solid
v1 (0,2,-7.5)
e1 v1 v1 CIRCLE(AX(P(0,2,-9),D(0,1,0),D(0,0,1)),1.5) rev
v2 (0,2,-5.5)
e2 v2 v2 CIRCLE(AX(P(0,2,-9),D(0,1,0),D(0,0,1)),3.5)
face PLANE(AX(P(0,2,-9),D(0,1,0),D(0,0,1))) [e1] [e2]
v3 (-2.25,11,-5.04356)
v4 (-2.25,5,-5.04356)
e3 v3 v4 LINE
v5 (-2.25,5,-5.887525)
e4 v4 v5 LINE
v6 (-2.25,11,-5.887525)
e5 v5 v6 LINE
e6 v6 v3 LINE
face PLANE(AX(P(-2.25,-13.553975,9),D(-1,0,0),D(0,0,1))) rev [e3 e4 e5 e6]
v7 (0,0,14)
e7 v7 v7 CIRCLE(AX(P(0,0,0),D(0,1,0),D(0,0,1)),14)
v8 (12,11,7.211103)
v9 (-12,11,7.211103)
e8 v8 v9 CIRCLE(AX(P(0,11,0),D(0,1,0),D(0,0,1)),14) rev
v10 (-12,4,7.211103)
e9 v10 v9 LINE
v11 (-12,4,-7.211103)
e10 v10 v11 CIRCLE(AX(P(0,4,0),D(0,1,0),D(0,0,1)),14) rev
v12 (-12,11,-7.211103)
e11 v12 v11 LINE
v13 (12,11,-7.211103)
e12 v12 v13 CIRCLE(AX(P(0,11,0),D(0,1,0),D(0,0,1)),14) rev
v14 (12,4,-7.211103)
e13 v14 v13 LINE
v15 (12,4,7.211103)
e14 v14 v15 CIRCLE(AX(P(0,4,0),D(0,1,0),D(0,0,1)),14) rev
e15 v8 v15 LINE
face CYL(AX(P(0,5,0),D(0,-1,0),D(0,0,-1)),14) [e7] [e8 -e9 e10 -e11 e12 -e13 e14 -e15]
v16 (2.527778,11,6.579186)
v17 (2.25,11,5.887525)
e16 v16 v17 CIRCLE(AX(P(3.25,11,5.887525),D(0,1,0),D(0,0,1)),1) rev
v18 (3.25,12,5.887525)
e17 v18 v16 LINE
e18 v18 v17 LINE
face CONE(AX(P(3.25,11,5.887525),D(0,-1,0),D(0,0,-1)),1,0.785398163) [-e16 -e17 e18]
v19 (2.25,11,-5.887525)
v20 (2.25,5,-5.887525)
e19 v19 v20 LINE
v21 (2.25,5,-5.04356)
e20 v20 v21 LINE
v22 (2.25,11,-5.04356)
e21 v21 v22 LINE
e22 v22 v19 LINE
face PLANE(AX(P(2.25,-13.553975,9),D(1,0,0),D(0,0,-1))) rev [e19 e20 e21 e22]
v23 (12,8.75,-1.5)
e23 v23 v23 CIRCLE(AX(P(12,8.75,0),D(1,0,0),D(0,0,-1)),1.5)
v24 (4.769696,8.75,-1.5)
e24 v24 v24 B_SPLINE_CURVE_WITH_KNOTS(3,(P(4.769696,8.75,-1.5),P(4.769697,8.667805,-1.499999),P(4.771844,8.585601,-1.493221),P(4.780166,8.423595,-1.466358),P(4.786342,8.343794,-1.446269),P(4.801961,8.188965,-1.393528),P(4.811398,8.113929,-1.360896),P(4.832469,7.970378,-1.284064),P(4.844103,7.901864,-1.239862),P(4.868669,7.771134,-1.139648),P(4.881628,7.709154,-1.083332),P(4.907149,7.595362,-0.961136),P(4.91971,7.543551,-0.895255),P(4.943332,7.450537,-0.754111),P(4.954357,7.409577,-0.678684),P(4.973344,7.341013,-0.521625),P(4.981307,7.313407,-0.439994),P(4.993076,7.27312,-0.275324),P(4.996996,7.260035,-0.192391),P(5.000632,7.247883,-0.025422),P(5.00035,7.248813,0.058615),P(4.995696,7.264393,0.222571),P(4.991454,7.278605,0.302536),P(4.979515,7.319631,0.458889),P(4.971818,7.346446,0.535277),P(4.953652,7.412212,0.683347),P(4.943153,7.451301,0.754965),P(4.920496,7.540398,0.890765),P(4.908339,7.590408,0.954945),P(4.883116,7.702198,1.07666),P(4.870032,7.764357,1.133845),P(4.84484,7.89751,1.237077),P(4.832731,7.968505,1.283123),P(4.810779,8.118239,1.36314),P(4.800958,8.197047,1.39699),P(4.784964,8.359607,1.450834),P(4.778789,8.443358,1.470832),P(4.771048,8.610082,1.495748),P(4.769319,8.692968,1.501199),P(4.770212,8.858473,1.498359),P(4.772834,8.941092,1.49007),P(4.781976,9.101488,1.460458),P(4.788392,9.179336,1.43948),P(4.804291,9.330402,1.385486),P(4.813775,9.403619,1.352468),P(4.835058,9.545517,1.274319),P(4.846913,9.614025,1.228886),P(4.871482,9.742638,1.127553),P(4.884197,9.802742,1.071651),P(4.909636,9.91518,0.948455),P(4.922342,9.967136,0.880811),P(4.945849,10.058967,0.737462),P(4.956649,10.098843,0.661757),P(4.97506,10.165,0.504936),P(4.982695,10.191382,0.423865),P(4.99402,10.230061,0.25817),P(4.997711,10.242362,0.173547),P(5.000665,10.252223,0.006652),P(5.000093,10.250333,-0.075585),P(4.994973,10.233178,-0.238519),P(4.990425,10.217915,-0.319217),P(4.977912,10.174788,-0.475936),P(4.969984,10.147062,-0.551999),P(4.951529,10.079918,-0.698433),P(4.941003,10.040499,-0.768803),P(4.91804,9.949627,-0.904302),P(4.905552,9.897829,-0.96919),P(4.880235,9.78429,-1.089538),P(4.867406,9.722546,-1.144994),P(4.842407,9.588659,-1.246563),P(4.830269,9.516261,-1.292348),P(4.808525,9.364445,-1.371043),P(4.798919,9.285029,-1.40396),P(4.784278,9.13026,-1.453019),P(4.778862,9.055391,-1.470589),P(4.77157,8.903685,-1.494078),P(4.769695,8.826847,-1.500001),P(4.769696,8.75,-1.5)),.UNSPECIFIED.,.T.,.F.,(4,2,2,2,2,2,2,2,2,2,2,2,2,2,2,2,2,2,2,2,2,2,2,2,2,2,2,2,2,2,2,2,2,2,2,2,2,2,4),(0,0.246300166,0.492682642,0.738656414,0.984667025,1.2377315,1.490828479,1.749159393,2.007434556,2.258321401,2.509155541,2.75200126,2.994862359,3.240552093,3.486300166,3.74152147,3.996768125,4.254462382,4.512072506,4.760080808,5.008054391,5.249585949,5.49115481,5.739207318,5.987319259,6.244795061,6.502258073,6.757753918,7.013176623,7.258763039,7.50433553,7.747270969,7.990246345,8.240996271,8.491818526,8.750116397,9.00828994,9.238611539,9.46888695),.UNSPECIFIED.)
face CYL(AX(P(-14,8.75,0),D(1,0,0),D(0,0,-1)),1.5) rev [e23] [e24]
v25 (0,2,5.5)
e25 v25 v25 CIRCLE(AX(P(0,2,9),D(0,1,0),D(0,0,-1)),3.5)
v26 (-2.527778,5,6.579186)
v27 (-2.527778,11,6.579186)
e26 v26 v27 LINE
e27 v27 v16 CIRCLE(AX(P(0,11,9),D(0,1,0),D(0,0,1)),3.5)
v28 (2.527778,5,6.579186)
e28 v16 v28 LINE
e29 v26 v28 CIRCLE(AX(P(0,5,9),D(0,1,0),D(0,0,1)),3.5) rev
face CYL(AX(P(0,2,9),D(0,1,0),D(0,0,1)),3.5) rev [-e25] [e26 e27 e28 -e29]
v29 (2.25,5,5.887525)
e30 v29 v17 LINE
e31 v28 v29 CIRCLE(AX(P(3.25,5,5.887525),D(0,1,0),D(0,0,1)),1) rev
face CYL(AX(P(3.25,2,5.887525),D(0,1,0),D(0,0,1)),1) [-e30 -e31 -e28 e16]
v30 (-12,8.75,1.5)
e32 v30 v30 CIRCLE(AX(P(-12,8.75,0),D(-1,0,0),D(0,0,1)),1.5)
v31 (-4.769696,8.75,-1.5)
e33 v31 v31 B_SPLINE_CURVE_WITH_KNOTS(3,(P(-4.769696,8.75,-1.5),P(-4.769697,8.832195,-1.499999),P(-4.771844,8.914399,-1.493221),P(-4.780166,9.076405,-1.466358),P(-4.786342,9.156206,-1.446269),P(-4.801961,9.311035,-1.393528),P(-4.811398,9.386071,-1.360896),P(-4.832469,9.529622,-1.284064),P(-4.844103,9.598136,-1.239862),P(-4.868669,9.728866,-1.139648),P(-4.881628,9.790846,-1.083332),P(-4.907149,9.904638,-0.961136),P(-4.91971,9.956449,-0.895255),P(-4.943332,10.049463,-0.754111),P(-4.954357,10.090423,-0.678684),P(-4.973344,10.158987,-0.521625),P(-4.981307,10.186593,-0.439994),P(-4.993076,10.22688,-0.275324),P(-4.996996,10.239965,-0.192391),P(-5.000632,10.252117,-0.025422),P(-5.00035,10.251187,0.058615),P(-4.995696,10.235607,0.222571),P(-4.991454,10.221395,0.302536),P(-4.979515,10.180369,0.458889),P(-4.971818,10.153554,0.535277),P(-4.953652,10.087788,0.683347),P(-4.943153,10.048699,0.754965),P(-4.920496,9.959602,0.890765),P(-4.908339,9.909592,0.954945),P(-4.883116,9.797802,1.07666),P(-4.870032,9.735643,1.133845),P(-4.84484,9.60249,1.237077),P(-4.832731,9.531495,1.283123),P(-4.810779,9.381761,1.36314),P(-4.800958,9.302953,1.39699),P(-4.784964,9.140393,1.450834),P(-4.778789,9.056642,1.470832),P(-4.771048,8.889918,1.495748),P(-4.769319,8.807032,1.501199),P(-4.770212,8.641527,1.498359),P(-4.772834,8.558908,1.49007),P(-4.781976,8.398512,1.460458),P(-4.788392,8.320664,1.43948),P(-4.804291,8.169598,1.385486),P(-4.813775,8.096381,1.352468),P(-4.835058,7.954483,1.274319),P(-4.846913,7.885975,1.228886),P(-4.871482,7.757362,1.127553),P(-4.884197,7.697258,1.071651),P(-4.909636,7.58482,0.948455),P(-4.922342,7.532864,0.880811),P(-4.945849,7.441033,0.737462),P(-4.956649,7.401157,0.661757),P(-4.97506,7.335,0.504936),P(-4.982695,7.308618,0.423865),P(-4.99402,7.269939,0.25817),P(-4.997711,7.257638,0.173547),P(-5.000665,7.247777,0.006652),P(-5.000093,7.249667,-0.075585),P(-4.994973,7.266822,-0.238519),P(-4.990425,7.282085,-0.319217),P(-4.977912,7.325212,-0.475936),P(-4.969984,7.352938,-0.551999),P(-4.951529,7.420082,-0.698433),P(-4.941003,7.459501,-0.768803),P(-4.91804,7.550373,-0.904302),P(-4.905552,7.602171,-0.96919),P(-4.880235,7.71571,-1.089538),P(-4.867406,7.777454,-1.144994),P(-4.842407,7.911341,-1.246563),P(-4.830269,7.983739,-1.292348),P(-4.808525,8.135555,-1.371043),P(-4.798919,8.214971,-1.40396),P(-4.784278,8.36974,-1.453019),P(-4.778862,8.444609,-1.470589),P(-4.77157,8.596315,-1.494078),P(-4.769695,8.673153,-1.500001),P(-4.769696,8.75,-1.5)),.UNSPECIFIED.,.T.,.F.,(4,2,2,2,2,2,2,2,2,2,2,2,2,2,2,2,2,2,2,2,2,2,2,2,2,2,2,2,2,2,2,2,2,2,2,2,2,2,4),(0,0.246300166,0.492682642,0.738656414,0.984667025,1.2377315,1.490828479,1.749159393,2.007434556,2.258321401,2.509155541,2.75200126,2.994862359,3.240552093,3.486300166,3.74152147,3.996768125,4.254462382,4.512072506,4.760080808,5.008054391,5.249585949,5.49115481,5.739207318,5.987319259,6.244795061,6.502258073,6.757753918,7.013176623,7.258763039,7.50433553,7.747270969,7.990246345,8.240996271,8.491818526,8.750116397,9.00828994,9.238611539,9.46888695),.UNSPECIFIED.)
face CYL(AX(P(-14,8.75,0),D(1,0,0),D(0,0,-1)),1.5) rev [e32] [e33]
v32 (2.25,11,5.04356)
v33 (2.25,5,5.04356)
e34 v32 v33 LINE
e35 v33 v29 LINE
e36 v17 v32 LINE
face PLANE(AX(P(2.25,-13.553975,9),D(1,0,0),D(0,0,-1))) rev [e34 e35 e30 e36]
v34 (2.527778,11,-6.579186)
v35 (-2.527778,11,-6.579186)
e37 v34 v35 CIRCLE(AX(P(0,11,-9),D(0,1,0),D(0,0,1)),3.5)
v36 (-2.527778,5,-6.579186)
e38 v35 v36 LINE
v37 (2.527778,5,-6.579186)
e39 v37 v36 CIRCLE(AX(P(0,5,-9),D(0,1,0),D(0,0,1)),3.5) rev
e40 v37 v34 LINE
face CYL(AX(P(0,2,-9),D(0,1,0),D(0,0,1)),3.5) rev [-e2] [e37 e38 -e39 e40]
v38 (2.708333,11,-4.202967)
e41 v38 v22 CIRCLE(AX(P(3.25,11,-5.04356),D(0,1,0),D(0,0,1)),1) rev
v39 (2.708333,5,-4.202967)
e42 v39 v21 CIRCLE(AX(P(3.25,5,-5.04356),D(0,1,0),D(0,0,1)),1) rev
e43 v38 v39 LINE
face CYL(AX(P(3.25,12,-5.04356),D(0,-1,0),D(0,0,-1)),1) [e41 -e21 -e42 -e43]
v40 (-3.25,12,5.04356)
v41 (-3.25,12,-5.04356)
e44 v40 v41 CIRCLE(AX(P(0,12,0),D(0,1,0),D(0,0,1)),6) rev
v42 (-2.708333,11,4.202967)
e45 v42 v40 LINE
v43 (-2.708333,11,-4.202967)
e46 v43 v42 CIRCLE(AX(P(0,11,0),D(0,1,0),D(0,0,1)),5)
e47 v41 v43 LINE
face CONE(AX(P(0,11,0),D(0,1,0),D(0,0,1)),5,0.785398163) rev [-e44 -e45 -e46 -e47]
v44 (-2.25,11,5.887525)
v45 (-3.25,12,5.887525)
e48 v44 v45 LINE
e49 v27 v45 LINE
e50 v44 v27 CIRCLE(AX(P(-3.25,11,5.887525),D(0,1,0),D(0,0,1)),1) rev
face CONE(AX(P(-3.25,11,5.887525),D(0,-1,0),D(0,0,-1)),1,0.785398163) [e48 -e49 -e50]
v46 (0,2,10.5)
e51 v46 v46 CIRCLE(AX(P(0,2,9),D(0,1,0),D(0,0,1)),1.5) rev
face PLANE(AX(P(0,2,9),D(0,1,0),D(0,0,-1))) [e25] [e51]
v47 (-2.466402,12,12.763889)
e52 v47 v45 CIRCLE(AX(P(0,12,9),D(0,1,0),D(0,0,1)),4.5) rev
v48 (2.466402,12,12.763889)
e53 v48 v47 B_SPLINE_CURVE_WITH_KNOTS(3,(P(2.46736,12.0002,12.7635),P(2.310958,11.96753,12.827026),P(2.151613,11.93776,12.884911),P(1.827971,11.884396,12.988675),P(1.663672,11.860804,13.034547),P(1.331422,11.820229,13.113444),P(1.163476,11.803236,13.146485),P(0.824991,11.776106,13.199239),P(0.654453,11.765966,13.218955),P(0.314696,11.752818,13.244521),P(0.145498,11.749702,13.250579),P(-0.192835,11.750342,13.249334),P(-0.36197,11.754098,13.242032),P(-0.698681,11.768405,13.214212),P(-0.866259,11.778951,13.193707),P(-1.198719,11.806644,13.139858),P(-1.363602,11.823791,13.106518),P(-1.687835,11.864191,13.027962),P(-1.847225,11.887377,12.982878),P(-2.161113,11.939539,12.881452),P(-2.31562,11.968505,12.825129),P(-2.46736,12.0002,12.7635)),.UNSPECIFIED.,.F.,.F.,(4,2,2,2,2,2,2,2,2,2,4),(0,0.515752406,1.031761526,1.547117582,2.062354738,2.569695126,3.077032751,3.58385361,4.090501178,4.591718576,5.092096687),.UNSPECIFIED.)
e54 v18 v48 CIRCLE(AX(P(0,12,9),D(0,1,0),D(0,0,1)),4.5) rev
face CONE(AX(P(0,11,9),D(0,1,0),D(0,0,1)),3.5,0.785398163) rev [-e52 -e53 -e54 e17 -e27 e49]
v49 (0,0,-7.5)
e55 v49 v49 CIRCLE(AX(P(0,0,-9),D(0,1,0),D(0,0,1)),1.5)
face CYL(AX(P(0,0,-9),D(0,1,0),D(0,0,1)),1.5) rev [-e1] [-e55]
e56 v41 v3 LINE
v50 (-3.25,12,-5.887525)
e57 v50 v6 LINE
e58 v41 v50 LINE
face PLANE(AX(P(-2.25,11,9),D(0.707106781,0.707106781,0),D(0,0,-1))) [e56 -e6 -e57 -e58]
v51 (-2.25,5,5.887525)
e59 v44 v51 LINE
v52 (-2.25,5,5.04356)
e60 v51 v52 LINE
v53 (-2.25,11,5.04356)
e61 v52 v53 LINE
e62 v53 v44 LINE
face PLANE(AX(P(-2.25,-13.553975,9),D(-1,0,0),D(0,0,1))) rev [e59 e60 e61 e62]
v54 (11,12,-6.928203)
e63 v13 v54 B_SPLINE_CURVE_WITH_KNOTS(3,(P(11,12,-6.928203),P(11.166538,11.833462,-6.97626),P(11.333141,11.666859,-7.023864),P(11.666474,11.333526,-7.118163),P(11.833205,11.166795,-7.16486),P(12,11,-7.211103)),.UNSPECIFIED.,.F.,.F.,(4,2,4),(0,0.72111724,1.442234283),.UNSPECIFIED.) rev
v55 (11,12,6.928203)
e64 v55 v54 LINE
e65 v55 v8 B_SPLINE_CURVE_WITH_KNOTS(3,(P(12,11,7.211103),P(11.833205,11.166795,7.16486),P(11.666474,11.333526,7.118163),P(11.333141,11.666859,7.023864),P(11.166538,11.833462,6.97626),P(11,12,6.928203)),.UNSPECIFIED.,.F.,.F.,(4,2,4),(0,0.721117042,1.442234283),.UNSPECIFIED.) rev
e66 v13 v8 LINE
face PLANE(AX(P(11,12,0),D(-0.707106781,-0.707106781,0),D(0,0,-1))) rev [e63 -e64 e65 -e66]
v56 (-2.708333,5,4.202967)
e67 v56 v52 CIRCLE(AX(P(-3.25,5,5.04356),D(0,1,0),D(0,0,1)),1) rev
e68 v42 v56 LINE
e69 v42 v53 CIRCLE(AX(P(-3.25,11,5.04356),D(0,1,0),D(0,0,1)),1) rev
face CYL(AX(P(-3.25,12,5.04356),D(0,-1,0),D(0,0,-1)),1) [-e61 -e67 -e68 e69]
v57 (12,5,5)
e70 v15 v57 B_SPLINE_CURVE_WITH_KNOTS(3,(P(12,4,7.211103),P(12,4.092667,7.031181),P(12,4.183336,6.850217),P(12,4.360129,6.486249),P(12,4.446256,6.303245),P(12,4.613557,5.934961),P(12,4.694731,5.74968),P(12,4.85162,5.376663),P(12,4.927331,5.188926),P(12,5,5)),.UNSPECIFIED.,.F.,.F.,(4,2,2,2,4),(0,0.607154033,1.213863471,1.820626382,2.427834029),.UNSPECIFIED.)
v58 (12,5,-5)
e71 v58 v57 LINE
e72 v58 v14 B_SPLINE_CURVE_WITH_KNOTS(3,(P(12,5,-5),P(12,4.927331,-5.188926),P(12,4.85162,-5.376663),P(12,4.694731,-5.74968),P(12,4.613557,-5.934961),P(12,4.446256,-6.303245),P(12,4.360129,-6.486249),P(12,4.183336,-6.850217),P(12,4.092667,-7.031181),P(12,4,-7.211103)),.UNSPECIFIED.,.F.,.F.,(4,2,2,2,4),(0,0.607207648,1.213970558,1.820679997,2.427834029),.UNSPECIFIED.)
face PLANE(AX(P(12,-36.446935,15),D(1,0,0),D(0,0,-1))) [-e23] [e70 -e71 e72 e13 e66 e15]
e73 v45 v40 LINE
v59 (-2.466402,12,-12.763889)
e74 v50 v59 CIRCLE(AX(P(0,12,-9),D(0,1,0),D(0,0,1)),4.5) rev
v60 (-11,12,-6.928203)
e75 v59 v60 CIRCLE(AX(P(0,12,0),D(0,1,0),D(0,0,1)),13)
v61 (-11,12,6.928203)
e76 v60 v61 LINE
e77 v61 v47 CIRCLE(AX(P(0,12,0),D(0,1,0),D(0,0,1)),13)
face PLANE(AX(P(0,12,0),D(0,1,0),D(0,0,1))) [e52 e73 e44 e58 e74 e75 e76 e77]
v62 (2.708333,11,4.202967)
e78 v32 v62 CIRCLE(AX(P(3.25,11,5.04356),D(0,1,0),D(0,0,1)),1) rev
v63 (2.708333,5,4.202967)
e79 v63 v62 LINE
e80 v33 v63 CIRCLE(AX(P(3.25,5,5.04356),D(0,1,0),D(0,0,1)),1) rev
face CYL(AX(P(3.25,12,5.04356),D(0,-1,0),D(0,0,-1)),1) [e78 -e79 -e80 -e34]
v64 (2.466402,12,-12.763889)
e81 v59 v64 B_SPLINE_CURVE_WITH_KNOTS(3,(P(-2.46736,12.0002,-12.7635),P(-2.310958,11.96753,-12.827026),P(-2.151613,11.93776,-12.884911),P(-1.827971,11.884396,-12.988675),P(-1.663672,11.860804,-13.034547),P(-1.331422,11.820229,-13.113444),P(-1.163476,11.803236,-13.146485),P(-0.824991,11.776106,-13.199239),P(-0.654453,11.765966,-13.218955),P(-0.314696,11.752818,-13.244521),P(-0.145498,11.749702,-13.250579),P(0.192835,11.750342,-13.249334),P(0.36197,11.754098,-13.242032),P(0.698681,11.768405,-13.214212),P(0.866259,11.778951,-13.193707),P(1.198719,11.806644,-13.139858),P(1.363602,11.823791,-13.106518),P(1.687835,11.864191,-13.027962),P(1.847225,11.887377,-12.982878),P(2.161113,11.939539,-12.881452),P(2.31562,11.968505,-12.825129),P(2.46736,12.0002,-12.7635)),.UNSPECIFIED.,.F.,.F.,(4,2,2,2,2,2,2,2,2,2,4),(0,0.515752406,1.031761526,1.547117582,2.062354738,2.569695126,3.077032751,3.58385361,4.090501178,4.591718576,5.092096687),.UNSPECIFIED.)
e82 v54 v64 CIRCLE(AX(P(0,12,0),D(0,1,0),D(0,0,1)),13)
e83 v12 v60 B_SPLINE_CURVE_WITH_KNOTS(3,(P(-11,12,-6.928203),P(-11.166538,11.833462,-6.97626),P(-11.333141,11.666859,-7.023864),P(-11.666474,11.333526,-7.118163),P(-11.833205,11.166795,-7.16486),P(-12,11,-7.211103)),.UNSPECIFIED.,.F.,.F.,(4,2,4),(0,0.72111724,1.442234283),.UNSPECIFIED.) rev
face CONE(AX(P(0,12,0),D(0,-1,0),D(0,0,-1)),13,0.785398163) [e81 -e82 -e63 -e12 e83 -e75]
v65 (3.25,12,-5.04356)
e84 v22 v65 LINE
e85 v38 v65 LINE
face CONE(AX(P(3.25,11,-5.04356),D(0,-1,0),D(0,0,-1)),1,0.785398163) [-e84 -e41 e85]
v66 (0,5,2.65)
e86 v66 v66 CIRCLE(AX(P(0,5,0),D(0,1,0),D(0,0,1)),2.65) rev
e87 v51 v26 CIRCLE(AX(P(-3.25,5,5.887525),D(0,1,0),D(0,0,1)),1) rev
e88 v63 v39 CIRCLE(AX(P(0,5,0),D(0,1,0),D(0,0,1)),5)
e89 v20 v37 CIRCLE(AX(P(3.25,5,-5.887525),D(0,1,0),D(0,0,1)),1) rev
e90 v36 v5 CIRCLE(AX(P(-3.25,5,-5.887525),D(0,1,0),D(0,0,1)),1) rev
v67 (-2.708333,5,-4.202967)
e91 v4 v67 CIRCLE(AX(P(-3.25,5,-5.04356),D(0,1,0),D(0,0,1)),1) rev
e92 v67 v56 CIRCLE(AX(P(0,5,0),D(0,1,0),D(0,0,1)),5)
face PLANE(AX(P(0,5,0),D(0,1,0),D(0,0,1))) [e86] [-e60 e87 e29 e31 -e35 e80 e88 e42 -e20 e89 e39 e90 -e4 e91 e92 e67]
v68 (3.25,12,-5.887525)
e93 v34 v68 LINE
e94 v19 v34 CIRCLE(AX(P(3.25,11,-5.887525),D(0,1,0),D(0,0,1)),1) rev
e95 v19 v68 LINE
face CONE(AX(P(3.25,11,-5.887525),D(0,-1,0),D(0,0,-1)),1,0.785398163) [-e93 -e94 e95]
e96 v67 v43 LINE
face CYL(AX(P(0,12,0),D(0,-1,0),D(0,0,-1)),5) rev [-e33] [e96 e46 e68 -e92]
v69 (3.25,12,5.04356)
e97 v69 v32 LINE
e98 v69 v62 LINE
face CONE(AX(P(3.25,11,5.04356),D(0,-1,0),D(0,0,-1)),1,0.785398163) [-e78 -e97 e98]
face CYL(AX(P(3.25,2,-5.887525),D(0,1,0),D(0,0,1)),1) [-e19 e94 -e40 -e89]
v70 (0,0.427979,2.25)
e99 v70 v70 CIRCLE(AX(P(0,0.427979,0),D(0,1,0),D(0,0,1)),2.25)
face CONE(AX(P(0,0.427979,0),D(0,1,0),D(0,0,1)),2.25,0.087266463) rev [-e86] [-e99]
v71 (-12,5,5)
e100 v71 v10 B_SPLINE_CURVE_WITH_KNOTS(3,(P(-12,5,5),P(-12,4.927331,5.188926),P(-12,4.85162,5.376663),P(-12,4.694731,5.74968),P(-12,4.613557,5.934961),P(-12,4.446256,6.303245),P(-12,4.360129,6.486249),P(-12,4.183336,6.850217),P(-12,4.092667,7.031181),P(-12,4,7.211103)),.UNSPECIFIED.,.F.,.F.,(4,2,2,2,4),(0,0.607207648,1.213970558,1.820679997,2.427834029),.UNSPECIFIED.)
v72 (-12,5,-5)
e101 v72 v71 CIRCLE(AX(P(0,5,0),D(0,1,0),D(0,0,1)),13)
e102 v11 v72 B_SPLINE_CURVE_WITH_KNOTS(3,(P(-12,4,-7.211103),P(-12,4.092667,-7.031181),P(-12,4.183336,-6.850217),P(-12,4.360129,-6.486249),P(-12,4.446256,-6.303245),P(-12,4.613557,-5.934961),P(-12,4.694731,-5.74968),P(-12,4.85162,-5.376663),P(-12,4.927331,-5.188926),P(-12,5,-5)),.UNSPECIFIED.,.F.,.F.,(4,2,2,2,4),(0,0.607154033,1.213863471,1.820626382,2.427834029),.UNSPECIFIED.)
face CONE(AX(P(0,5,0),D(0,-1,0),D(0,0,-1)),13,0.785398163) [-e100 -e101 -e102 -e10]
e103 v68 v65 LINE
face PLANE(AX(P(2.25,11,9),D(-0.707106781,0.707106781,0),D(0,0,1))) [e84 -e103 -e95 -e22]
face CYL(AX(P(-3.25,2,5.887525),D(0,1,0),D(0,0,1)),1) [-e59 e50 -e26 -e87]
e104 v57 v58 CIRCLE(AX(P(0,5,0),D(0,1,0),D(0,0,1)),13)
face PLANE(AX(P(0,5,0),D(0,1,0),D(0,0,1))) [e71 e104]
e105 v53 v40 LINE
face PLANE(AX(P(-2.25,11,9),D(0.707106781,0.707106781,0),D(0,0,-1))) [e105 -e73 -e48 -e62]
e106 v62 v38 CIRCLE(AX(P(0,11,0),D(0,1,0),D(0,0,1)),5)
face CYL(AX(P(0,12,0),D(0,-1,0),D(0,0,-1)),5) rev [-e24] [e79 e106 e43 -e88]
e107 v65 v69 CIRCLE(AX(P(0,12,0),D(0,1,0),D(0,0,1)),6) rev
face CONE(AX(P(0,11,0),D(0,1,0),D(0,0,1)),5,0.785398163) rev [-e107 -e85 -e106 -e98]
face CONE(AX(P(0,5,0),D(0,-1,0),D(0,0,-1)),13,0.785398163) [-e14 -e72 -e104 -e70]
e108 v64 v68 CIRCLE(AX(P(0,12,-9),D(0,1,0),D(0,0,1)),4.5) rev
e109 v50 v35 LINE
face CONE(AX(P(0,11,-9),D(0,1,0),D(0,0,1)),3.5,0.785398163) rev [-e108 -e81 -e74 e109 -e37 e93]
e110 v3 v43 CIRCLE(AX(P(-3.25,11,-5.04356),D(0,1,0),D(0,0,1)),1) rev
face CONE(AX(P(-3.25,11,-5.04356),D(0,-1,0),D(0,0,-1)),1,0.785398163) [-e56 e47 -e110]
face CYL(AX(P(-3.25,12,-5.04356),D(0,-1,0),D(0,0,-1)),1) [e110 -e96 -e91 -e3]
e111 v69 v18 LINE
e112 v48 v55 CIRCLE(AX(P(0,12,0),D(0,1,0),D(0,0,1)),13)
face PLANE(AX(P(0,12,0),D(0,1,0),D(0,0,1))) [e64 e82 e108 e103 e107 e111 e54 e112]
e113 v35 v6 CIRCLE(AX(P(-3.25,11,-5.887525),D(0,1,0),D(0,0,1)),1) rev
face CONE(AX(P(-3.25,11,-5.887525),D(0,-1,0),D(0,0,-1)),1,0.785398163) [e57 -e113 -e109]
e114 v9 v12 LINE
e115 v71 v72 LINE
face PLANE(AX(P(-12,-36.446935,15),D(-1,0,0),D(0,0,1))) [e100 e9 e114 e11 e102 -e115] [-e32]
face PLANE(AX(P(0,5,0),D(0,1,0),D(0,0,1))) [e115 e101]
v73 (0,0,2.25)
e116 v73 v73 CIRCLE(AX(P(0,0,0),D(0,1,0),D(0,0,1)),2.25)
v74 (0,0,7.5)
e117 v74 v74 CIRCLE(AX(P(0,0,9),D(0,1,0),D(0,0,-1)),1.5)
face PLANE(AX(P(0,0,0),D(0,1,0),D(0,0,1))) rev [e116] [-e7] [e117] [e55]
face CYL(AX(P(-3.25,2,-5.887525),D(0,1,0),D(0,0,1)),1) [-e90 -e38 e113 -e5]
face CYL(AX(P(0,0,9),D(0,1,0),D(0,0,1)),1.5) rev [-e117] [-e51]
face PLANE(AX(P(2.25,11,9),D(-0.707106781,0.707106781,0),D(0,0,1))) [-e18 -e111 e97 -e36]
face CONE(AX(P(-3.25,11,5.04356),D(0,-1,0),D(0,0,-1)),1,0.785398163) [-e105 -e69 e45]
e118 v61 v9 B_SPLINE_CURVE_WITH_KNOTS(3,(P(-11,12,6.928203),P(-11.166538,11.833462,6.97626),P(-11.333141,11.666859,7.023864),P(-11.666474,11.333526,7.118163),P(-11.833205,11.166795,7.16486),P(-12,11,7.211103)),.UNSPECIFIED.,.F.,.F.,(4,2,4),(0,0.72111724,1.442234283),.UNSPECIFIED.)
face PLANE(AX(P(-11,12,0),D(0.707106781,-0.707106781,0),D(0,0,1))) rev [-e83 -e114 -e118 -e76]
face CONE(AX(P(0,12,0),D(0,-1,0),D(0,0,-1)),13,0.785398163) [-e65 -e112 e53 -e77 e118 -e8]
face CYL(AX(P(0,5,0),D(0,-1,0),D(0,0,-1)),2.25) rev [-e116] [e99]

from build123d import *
from build123d.topology import SkipClean

# Parameters (mm, degrees)
SKETCH1_R           = 14
SKETCH1_R_2         = 2.25
BOSS_EXTRUDE1_DEPTH = 5
SKETCH2_R           = 1.5
CUT_EXTRUDE1_DEPTH  = 21.420577857
SKETCH4_R           = 3.5
CUT_EXTRUDE2_DEPTH  = 3
CIRPATTERN1_COUNT   = 2
SKETCH5_R           = 14
SKETCH5_R_2         = 5
BOSS_EXTRUDE2_DEPTH = 7
SKETCH6_R           = 3.5
CUT_EXTRUDE3_DEPTH  = 22
SKETCH9_OUTSIDE_W   = 38.276
SKETCH9_OUTSIDE_H   = 38.276
SKETCH9_OUTSIDE_W_2 = 24
SKETCH9_OUTSIDE_H_2 = 30
CUT_EXTRUDE5_DEPTH  = 7
SKETCH10_R          = 1.5
CUT_EXTRUDE6_DEPTH  = 32.874754901
SKETCH12_W          = 4.5
SKETCH12_H          = 18
CUT_EXTRUDE7_DEPTH  = 7
CHAMFER2_SIZE       = 0.4
CHAMFER2_SIZE2      = 4.572020921
FILLET2_R           = 1
CHAMFER3_SIZE       = 1


# Some blends are built 0.0001 mm under size
with BuildPart() as part:
    # Sketch1 → Boss-Extrude1 (new body)
    with BuildSketch(Plane(origin=(0, 0, 0), x_dir=(1, 0, 0), z_dir=(0, 1, 0))):
        with Locations(Location((0, 0, 0), (0, 0, 270))):
            Circle(SKETCH1_R)
        with Locations(Location((0, 0, 0), (0, 0, 270))):
            Circle(SKETCH1_R_2, mode=Mode.SUBTRACT)
    extrude(amount=BOSS_EXTRUDE1_DEPTH)

    # Sketch2 → Cut-Extrude1 (cut, through all)
    with BuildSketch(Plane(origin=(0, 5, 0), x_dir=(1, 0, 0), z_dir=(0, 1, 0))):
        with Locations(Location((0, 9, 0), (0, 0, 270))):
            Circle(SKETCH2_R)
    cut_extrude1 = extrude(amount=-CUT_EXTRUDE1_DEPTH, mode=Mode.SUBTRACT)

    # Sketch4 → Cut-Extrude2 (cut)
    with BuildSketch(Plane(origin=(0, 5, 0), x_dir=(1, 0, 0), z_dir=(0, 1, 0))):
        with Locations(Location((0, 9, 0), (0, 0, 270))):
            Circle(SKETCH4_R)
    cut_extrude2 = extrude(amount=-CUT_EXTRUDE2_DEPTH, mode=Mode.SUBTRACT)

    # CirPattern1: Cut-Extrude1, Cut-Extrude2 ×2 about axis
    cirpattern1_axis = Axis((0, 0, 0), (0, 1, 0))
    add([cut_extrude1.rotate(cirpattern1_axis, i * 360 / CIRPATTERN1_COUNT) for i in range(1, CIRPATTERN1_COUNT)], mode=Mode.SUBTRACT)
    add([cut_extrude2.rotate(cirpattern1_axis, i * 360 / CIRPATTERN1_COUNT) for i in range(1, CIRPATTERN1_COUNT)], mode=Mode.SUBTRACT)

    # Sketch5 → Boss-Extrude2 (add)
    with BuildSketch(Plane(origin=(0, 5, 0), x_dir=(1, 0, 0), z_dir=(0, 1, 0))):
        with Locations(Location((0, 0, 0), (0, 0, 270))):
            Circle(SKETCH5_R)
        with Locations(Location((0, 0, 0), (0, 0, 270))):
            Circle(SKETCH5_R_2, mode=Mode.SUBTRACT)
    extrude(amount=BOSS_EXTRUDE2_DEPTH)

    # Sketch6 → Cut-Extrude3 (cut, through all)
    with SkipClean():  # the faces are left unmerged after this step: merging them gives an invalid solid
        with BuildSketch(Plane(origin=(0, 5, 0), x_dir=(1, 0, 0), z_dir=(0, 1, 0))):
            with Locations(Location((0, 9, 0), (0, 0, 270))):
                Circle(SKETCH6_R)
            with Locations(Location((0, -9, 0), (0, 0, 270))):
                Circle(SKETCH6_R)
        extrude(amount=CUT_EXTRUDE3_DEPTH, mode=Mode.SUBTRACT)

    # Sketch9 outside → Cut-Extrude5 (cut)
    with SkipClean():  # the faces are left unmerged after this step: merging them gives an invalid solid
        with BuildSketch(Plane(origin=(0, 12, 0), x_dir=(1, 0, 0), z_dir=(0, 1, 0))):
            Rectangle(SKETCH9_OUTSIDE_W, SKETCH9_OUTSIDE_H)
            Rectangle(SKETCH9_OUTSIDE_W_2, SKETCH9_OUTSIDE_H_2, mode=Mode.SUBTRACT)
        extrude(amount=-CUT_EXTRUDE5_DEPTH, mode=Mode.SUBTRACT)

    # Sketch10 → Cut-Extrude6 (cut, through all)
    with SkipClean():  # the faces are left unmerged after this step: merging them gives an invalid solid
        with BuildSketch(Plane(origin=(12, 0, 0), x_dir=(0, 0, -1), z_dir=(1, 0, 0))):
            with Locations((0, 8.75)):
                Circle(SKETCH10_R)
        extrude(amount=-CUT_EXTRUDE6_DEPTH, mode=Mode.SUBTRACT)

    # Sketch12 → Cut-Extrude7 (cut)
    with SkipClean():  # the faces are left unmerged after this step: merging them gives an invalid solid
        with BuildSketch(Plane(origin=(0, 12, 0), x_dir=(1, 0, 0), z_dir=(0, 1, 0))):
            Rectangle(SKETCH12_W, SKETCH12_H)
        extrude(amount=-CUT_EXTRUDE7_DEPTH, mode=Mode.SUBTRACT)
    add(part.part.scale(1), mode=Mode.REPLACE)  # the faces are merged on a copy

    # Chamfer2
    chamfer2_edges = [part.edges().sort_by_distance(p)[0] for p in [
        (1.59099026, 5, 1.590990255),
    ]]
    chamfer2_side = [part.faces().sort_by_distance(p)[0] for p in [
        (0, 5, 3.259288519),
    ]]
    chamfer(chamfer2_edges, length=CHAMFER2_SIZE, length2=CHAMFER2_SIZE2, reference=chamfer2_side[0])

    # Fillet2
    # the kernel refuses this fillet: 1 mm, written as the material it takes off along each edge
    with BuildSketch(Plane(origin=(2.25, 13.446043689, -4.465142775), x_dir=(0, 0, -1), z_dir=(0, -1, 0)), Plane(origin=(-2.25, 13.446043689, 4.465142775), x_dir=(0, 0, 1), z_dir=(0, -1, 0))) as fillet2_piece_1:
        with BuildLine():
            CenterArc((0.578417476, 1), FILLET2_R, 212.797168296, 57.202831704)
            ThreePointArc((-0.262175899, 0.458333333), (-0.125033492, 0.232629939), (0, 0))
            Line((0, 0), (0.578417476, 0))
        make_face()
    extrude(amount=8.446043689, mode=Mode.SUBTRACT)
    with BuildSketch(Plane(origin=(2.25, 13.446043689, 4.465142775), x_dir=(0.8680218565985627, 0, -0.49652598770576395), z_dir=(0, -1, 0))) as fillet2_piece_2:
        with BuildLine():
            CenterArc((0.580822548, 0.998604999), FILLET2_R, 209.770426123, 57.202831704)
            Line((-0.287199308, 0.502079011), (0, 0))
            ThreePointArc((0, 0), (0.264010249, 0.006975006), (0.528020498, 0))
        make_face()
    extrude(amount=8.446043689, mode=Mode.SUBTRACT)
    with BuildSketch(Plane(origin=(-2.25, 13.446043689, -4.465142775), x_dir=(0, 0, -1), z_dir=(0, -1, 0))) as fillet2_piece_3:
        with BuildLine():
            CenterArc((0.578417476, -1), FILLET2_R, 90, 57.202831704)
            ThreePointArc((-0.262175899, -0.458333333), (-0.125033492, -0.232629939), (0, 0))
            Line((0, 0), (0.578417476, 0))
        make_face()
    extrude(amount=8.446043689, mode=Mode.SUBTRACT)
    with BuildSketch(Plane(origin=(-2.25, 13.07880894, -6.319048676), x_dir=(0, 0, 1), z_dir=(0, -1, 0))) as fillet2_piece_4:
        with BuildLine():
            CenterArc((0.431523576, 1), FILLET2_R, 226.238257307, 43.761742693)
            ThreePointArc((-0.260137513, 0.277777778), (-0.126290486, 0.14242722), (0, 0))
            Line((0, 0), (0.431523576, 0))
        make_face()
    extrude(amount=8.07880894, mode=Mode.SUBTRACT)
    with BuildSketch(Plane(origin=(-2.25, 13.07880894, 6.319048676), x_dir=(-0.7299030964550425, 0, 0.683550634397585), z_dir=(0, -1, 0)), Plane(origin=(2.25, 13.07880894, -6.319048676), x_dir=(0.7299030964550413, 0, -0.6835506343975865), z_dir=(0, -1, 0))) as fillet2_piece_5:
        with BuildLine():
            CenterArc((0.434934882, 0.998521029), FILLET2_R, 223.121729096, 43.761742693)
            Line((-0.294968214, 0.314970394), (0, 0))
            ThreePointArc((0, 0), (0.190284011, 0.0051764), (0.380568022, 0))
        make_face()
    extrude(amount=8.07880894, mode=Mode.SUBTRACT)
    with BuildSketch(Plane(origin=(2.25, 13.07880894, 6.319048676), x_dir=(0.7299030964550418, 0, 0.6835506343975857), z_dir=(0, -1, 0))) as fillet2_piece_6:
        with BuildLine():
            CenterArc((0.434934882, -0.998521029), FILLET2_R, 93.116528211, 43.761742693)
            Line((-0.294968214, -0.314970394), (0, 0))
            ThreePointArc((0, 0), (0.190284011, -0.0051764), (0.380568022, 0))
        make_face()
    extrude(amount=8.07880894, mode=Mode.SUBTRACT)

    # Chamfer3
    chamfer3_edges = [part.edges().sort_by_distance(p)[0] for p in [
        (-2.372028854, 12, -4.564846697),
        (5, 12, 0),
        (2.372028854, 12, -4.564846697),
        (2.25, 12, -5.465542675),
        (2.322039273, 12, -6.260203097),
        (0, 12, -12.5),
        (-2.322039273, 12, -6.260203097),
        (-2.25, 12, -5.465542675),
        (-5, 12, 0),
        (-2.372028854, 12, 4.564846697),
        (-2.25, 12, 5.465542675),
        (-2.322039273, 12, 6.260203097),
        (-3.218916614, 12, 10.374254646),
        (3.218916614, 12, 10.374254646),
        (2.322039273, 12, 6.260203097),
        (2.25, 12, 5.465542675),
        (2.372028854, 12, 4.564846697),
    ]]
    chamfer(chamfer3_edges, length=CHAMFER3_SIZE - 0.0001)  # a hair under: the kernel refuses the full size
    chamfer3_2_edges = [part.edges().sort_by_distance(p)[0] for p in [
        (-14, 5, 0),
    ]]
    chamfer(chamfer3_2_edges, length=CHAMFER3_SIZE)
    chamfer3_3_edges = [part.edges().sort_by_distance(p)[0] for p in [
        (14, 5, 0),
    ]]
    chamfer(chamfer3_3_edges, length=CHAMFER3_SIZE)
    chamfer3_4_edges = [part.edges().sort_by_distance(p)[0] for p in [
        (-12, 12, 0),
    ]]
    chamfer(chamfer3_4_edges, length=CHAMFER3_SIZE)
    chamfer3_5_edges = [part.edges().sort_by_distance(p)[0] for p in [
        (12, 12, 0),
    ]]
    chamfer(chamfer3_5_edges, length=CHAMFER3_SIZE)
    # the kernel refuses this chamfer: 1 mm, written as the material it takes off along each edge
    with BuildSketch(Plane(origin=(0, 12, 0), x_dir=(-0.8854986236945603, 0, 0.46464199921556715), z_dir=(-0.46464199921556715, 0, -0.8854986236945603))) as chamfer3_6_piece_1:
        with BuildLine():
            Line((14.028284271, -1.028284271), (12.971715729, 0.028284271))
            Line((12.971715729, 0.028284271), (12.971715729, 0.048284271))
            ThreePointArc((12.971715729, 0.048284271), (13.485857864, 0.02), (14, 0.02))
            Line((14, 0.02), (14.02, 0))
            ThreePointArc((14.02, 0), (14.02, -0.514142136), (14.048284271, -1.028284271))
            Line((14.048284271, -1.028284271), (14.028284271, -1.028284271))
        make_face()
    revolve(axis=Axis((0, 12, 0), (0, 1, 0)), revolution_arc=62.312944684, mode=Mode.SUBTRACT)
    with BuildSketch(Plane(origin=(0, 12, 0), x_dir=(0, 0, 1), z_dir=(-1, 0, 0))) as chamfer3_6_piece_2:
        with BuildLine():
            Line((14.028284271, -1.028284271), (12.971715729, 0.028284271))
            Line((12.971715729, 0.028284271), (12.971715729, 0.048284271))
            ThreePointArc((12.971715729, 0.048284271), (13.485857864, 0.02), (14, 0.02))
            Line((14, 0.02), (14.02, 0))
            ThreePointArc((14.02, 0), (14.02, -0.514142136), (14.048284271, -1.028284271))
            Line((14.048284271, -1.028284271), (14.028284271, -1.028284271))
        make_face()
    revolve(axis=Axis((0, 12, 0), (0, 1, 0)), revolution_arc=62.312944684, mode=Mode.SUBTRACT)
    # the kernel refuses this chamfer: 1 mm, written as the material it takes off along each edge
    with BuildSketch(Plane(origin=(0, 12, 0), x_dir=(0.8855326835196512, 0, -0.46457708339788484), z_dir=(0.46457708339788484, 0, 0.8855326835196512))) as chamfer3_7_piece_1:
        with BuildLine():
            Line((14.028284271, -1.028284271), (12.971715729, 0.028284271))
            Line((12.971715729, 0.028284271), (12.971715729, 0.048284271))
            ThreePointArc((12.971715729, 0.048284271), (13.485857864, 0.02), (14, 0.02))
            Line((14, 0.02), (14.02, 0))
            ThreePointArc((14.02, 0), (14.02, -0.514142136), (14.048284271, -1.028284271))
            Line((14.048284271, -1.028284271), (14.028284271, -1.028284271))
        make_face()
    revolve(axis=Axis((0, 12, 0), (0, 1, 0)), revolution_arc=124.634289903, mode=Mode.SUBTRACT)


solid = part.part
